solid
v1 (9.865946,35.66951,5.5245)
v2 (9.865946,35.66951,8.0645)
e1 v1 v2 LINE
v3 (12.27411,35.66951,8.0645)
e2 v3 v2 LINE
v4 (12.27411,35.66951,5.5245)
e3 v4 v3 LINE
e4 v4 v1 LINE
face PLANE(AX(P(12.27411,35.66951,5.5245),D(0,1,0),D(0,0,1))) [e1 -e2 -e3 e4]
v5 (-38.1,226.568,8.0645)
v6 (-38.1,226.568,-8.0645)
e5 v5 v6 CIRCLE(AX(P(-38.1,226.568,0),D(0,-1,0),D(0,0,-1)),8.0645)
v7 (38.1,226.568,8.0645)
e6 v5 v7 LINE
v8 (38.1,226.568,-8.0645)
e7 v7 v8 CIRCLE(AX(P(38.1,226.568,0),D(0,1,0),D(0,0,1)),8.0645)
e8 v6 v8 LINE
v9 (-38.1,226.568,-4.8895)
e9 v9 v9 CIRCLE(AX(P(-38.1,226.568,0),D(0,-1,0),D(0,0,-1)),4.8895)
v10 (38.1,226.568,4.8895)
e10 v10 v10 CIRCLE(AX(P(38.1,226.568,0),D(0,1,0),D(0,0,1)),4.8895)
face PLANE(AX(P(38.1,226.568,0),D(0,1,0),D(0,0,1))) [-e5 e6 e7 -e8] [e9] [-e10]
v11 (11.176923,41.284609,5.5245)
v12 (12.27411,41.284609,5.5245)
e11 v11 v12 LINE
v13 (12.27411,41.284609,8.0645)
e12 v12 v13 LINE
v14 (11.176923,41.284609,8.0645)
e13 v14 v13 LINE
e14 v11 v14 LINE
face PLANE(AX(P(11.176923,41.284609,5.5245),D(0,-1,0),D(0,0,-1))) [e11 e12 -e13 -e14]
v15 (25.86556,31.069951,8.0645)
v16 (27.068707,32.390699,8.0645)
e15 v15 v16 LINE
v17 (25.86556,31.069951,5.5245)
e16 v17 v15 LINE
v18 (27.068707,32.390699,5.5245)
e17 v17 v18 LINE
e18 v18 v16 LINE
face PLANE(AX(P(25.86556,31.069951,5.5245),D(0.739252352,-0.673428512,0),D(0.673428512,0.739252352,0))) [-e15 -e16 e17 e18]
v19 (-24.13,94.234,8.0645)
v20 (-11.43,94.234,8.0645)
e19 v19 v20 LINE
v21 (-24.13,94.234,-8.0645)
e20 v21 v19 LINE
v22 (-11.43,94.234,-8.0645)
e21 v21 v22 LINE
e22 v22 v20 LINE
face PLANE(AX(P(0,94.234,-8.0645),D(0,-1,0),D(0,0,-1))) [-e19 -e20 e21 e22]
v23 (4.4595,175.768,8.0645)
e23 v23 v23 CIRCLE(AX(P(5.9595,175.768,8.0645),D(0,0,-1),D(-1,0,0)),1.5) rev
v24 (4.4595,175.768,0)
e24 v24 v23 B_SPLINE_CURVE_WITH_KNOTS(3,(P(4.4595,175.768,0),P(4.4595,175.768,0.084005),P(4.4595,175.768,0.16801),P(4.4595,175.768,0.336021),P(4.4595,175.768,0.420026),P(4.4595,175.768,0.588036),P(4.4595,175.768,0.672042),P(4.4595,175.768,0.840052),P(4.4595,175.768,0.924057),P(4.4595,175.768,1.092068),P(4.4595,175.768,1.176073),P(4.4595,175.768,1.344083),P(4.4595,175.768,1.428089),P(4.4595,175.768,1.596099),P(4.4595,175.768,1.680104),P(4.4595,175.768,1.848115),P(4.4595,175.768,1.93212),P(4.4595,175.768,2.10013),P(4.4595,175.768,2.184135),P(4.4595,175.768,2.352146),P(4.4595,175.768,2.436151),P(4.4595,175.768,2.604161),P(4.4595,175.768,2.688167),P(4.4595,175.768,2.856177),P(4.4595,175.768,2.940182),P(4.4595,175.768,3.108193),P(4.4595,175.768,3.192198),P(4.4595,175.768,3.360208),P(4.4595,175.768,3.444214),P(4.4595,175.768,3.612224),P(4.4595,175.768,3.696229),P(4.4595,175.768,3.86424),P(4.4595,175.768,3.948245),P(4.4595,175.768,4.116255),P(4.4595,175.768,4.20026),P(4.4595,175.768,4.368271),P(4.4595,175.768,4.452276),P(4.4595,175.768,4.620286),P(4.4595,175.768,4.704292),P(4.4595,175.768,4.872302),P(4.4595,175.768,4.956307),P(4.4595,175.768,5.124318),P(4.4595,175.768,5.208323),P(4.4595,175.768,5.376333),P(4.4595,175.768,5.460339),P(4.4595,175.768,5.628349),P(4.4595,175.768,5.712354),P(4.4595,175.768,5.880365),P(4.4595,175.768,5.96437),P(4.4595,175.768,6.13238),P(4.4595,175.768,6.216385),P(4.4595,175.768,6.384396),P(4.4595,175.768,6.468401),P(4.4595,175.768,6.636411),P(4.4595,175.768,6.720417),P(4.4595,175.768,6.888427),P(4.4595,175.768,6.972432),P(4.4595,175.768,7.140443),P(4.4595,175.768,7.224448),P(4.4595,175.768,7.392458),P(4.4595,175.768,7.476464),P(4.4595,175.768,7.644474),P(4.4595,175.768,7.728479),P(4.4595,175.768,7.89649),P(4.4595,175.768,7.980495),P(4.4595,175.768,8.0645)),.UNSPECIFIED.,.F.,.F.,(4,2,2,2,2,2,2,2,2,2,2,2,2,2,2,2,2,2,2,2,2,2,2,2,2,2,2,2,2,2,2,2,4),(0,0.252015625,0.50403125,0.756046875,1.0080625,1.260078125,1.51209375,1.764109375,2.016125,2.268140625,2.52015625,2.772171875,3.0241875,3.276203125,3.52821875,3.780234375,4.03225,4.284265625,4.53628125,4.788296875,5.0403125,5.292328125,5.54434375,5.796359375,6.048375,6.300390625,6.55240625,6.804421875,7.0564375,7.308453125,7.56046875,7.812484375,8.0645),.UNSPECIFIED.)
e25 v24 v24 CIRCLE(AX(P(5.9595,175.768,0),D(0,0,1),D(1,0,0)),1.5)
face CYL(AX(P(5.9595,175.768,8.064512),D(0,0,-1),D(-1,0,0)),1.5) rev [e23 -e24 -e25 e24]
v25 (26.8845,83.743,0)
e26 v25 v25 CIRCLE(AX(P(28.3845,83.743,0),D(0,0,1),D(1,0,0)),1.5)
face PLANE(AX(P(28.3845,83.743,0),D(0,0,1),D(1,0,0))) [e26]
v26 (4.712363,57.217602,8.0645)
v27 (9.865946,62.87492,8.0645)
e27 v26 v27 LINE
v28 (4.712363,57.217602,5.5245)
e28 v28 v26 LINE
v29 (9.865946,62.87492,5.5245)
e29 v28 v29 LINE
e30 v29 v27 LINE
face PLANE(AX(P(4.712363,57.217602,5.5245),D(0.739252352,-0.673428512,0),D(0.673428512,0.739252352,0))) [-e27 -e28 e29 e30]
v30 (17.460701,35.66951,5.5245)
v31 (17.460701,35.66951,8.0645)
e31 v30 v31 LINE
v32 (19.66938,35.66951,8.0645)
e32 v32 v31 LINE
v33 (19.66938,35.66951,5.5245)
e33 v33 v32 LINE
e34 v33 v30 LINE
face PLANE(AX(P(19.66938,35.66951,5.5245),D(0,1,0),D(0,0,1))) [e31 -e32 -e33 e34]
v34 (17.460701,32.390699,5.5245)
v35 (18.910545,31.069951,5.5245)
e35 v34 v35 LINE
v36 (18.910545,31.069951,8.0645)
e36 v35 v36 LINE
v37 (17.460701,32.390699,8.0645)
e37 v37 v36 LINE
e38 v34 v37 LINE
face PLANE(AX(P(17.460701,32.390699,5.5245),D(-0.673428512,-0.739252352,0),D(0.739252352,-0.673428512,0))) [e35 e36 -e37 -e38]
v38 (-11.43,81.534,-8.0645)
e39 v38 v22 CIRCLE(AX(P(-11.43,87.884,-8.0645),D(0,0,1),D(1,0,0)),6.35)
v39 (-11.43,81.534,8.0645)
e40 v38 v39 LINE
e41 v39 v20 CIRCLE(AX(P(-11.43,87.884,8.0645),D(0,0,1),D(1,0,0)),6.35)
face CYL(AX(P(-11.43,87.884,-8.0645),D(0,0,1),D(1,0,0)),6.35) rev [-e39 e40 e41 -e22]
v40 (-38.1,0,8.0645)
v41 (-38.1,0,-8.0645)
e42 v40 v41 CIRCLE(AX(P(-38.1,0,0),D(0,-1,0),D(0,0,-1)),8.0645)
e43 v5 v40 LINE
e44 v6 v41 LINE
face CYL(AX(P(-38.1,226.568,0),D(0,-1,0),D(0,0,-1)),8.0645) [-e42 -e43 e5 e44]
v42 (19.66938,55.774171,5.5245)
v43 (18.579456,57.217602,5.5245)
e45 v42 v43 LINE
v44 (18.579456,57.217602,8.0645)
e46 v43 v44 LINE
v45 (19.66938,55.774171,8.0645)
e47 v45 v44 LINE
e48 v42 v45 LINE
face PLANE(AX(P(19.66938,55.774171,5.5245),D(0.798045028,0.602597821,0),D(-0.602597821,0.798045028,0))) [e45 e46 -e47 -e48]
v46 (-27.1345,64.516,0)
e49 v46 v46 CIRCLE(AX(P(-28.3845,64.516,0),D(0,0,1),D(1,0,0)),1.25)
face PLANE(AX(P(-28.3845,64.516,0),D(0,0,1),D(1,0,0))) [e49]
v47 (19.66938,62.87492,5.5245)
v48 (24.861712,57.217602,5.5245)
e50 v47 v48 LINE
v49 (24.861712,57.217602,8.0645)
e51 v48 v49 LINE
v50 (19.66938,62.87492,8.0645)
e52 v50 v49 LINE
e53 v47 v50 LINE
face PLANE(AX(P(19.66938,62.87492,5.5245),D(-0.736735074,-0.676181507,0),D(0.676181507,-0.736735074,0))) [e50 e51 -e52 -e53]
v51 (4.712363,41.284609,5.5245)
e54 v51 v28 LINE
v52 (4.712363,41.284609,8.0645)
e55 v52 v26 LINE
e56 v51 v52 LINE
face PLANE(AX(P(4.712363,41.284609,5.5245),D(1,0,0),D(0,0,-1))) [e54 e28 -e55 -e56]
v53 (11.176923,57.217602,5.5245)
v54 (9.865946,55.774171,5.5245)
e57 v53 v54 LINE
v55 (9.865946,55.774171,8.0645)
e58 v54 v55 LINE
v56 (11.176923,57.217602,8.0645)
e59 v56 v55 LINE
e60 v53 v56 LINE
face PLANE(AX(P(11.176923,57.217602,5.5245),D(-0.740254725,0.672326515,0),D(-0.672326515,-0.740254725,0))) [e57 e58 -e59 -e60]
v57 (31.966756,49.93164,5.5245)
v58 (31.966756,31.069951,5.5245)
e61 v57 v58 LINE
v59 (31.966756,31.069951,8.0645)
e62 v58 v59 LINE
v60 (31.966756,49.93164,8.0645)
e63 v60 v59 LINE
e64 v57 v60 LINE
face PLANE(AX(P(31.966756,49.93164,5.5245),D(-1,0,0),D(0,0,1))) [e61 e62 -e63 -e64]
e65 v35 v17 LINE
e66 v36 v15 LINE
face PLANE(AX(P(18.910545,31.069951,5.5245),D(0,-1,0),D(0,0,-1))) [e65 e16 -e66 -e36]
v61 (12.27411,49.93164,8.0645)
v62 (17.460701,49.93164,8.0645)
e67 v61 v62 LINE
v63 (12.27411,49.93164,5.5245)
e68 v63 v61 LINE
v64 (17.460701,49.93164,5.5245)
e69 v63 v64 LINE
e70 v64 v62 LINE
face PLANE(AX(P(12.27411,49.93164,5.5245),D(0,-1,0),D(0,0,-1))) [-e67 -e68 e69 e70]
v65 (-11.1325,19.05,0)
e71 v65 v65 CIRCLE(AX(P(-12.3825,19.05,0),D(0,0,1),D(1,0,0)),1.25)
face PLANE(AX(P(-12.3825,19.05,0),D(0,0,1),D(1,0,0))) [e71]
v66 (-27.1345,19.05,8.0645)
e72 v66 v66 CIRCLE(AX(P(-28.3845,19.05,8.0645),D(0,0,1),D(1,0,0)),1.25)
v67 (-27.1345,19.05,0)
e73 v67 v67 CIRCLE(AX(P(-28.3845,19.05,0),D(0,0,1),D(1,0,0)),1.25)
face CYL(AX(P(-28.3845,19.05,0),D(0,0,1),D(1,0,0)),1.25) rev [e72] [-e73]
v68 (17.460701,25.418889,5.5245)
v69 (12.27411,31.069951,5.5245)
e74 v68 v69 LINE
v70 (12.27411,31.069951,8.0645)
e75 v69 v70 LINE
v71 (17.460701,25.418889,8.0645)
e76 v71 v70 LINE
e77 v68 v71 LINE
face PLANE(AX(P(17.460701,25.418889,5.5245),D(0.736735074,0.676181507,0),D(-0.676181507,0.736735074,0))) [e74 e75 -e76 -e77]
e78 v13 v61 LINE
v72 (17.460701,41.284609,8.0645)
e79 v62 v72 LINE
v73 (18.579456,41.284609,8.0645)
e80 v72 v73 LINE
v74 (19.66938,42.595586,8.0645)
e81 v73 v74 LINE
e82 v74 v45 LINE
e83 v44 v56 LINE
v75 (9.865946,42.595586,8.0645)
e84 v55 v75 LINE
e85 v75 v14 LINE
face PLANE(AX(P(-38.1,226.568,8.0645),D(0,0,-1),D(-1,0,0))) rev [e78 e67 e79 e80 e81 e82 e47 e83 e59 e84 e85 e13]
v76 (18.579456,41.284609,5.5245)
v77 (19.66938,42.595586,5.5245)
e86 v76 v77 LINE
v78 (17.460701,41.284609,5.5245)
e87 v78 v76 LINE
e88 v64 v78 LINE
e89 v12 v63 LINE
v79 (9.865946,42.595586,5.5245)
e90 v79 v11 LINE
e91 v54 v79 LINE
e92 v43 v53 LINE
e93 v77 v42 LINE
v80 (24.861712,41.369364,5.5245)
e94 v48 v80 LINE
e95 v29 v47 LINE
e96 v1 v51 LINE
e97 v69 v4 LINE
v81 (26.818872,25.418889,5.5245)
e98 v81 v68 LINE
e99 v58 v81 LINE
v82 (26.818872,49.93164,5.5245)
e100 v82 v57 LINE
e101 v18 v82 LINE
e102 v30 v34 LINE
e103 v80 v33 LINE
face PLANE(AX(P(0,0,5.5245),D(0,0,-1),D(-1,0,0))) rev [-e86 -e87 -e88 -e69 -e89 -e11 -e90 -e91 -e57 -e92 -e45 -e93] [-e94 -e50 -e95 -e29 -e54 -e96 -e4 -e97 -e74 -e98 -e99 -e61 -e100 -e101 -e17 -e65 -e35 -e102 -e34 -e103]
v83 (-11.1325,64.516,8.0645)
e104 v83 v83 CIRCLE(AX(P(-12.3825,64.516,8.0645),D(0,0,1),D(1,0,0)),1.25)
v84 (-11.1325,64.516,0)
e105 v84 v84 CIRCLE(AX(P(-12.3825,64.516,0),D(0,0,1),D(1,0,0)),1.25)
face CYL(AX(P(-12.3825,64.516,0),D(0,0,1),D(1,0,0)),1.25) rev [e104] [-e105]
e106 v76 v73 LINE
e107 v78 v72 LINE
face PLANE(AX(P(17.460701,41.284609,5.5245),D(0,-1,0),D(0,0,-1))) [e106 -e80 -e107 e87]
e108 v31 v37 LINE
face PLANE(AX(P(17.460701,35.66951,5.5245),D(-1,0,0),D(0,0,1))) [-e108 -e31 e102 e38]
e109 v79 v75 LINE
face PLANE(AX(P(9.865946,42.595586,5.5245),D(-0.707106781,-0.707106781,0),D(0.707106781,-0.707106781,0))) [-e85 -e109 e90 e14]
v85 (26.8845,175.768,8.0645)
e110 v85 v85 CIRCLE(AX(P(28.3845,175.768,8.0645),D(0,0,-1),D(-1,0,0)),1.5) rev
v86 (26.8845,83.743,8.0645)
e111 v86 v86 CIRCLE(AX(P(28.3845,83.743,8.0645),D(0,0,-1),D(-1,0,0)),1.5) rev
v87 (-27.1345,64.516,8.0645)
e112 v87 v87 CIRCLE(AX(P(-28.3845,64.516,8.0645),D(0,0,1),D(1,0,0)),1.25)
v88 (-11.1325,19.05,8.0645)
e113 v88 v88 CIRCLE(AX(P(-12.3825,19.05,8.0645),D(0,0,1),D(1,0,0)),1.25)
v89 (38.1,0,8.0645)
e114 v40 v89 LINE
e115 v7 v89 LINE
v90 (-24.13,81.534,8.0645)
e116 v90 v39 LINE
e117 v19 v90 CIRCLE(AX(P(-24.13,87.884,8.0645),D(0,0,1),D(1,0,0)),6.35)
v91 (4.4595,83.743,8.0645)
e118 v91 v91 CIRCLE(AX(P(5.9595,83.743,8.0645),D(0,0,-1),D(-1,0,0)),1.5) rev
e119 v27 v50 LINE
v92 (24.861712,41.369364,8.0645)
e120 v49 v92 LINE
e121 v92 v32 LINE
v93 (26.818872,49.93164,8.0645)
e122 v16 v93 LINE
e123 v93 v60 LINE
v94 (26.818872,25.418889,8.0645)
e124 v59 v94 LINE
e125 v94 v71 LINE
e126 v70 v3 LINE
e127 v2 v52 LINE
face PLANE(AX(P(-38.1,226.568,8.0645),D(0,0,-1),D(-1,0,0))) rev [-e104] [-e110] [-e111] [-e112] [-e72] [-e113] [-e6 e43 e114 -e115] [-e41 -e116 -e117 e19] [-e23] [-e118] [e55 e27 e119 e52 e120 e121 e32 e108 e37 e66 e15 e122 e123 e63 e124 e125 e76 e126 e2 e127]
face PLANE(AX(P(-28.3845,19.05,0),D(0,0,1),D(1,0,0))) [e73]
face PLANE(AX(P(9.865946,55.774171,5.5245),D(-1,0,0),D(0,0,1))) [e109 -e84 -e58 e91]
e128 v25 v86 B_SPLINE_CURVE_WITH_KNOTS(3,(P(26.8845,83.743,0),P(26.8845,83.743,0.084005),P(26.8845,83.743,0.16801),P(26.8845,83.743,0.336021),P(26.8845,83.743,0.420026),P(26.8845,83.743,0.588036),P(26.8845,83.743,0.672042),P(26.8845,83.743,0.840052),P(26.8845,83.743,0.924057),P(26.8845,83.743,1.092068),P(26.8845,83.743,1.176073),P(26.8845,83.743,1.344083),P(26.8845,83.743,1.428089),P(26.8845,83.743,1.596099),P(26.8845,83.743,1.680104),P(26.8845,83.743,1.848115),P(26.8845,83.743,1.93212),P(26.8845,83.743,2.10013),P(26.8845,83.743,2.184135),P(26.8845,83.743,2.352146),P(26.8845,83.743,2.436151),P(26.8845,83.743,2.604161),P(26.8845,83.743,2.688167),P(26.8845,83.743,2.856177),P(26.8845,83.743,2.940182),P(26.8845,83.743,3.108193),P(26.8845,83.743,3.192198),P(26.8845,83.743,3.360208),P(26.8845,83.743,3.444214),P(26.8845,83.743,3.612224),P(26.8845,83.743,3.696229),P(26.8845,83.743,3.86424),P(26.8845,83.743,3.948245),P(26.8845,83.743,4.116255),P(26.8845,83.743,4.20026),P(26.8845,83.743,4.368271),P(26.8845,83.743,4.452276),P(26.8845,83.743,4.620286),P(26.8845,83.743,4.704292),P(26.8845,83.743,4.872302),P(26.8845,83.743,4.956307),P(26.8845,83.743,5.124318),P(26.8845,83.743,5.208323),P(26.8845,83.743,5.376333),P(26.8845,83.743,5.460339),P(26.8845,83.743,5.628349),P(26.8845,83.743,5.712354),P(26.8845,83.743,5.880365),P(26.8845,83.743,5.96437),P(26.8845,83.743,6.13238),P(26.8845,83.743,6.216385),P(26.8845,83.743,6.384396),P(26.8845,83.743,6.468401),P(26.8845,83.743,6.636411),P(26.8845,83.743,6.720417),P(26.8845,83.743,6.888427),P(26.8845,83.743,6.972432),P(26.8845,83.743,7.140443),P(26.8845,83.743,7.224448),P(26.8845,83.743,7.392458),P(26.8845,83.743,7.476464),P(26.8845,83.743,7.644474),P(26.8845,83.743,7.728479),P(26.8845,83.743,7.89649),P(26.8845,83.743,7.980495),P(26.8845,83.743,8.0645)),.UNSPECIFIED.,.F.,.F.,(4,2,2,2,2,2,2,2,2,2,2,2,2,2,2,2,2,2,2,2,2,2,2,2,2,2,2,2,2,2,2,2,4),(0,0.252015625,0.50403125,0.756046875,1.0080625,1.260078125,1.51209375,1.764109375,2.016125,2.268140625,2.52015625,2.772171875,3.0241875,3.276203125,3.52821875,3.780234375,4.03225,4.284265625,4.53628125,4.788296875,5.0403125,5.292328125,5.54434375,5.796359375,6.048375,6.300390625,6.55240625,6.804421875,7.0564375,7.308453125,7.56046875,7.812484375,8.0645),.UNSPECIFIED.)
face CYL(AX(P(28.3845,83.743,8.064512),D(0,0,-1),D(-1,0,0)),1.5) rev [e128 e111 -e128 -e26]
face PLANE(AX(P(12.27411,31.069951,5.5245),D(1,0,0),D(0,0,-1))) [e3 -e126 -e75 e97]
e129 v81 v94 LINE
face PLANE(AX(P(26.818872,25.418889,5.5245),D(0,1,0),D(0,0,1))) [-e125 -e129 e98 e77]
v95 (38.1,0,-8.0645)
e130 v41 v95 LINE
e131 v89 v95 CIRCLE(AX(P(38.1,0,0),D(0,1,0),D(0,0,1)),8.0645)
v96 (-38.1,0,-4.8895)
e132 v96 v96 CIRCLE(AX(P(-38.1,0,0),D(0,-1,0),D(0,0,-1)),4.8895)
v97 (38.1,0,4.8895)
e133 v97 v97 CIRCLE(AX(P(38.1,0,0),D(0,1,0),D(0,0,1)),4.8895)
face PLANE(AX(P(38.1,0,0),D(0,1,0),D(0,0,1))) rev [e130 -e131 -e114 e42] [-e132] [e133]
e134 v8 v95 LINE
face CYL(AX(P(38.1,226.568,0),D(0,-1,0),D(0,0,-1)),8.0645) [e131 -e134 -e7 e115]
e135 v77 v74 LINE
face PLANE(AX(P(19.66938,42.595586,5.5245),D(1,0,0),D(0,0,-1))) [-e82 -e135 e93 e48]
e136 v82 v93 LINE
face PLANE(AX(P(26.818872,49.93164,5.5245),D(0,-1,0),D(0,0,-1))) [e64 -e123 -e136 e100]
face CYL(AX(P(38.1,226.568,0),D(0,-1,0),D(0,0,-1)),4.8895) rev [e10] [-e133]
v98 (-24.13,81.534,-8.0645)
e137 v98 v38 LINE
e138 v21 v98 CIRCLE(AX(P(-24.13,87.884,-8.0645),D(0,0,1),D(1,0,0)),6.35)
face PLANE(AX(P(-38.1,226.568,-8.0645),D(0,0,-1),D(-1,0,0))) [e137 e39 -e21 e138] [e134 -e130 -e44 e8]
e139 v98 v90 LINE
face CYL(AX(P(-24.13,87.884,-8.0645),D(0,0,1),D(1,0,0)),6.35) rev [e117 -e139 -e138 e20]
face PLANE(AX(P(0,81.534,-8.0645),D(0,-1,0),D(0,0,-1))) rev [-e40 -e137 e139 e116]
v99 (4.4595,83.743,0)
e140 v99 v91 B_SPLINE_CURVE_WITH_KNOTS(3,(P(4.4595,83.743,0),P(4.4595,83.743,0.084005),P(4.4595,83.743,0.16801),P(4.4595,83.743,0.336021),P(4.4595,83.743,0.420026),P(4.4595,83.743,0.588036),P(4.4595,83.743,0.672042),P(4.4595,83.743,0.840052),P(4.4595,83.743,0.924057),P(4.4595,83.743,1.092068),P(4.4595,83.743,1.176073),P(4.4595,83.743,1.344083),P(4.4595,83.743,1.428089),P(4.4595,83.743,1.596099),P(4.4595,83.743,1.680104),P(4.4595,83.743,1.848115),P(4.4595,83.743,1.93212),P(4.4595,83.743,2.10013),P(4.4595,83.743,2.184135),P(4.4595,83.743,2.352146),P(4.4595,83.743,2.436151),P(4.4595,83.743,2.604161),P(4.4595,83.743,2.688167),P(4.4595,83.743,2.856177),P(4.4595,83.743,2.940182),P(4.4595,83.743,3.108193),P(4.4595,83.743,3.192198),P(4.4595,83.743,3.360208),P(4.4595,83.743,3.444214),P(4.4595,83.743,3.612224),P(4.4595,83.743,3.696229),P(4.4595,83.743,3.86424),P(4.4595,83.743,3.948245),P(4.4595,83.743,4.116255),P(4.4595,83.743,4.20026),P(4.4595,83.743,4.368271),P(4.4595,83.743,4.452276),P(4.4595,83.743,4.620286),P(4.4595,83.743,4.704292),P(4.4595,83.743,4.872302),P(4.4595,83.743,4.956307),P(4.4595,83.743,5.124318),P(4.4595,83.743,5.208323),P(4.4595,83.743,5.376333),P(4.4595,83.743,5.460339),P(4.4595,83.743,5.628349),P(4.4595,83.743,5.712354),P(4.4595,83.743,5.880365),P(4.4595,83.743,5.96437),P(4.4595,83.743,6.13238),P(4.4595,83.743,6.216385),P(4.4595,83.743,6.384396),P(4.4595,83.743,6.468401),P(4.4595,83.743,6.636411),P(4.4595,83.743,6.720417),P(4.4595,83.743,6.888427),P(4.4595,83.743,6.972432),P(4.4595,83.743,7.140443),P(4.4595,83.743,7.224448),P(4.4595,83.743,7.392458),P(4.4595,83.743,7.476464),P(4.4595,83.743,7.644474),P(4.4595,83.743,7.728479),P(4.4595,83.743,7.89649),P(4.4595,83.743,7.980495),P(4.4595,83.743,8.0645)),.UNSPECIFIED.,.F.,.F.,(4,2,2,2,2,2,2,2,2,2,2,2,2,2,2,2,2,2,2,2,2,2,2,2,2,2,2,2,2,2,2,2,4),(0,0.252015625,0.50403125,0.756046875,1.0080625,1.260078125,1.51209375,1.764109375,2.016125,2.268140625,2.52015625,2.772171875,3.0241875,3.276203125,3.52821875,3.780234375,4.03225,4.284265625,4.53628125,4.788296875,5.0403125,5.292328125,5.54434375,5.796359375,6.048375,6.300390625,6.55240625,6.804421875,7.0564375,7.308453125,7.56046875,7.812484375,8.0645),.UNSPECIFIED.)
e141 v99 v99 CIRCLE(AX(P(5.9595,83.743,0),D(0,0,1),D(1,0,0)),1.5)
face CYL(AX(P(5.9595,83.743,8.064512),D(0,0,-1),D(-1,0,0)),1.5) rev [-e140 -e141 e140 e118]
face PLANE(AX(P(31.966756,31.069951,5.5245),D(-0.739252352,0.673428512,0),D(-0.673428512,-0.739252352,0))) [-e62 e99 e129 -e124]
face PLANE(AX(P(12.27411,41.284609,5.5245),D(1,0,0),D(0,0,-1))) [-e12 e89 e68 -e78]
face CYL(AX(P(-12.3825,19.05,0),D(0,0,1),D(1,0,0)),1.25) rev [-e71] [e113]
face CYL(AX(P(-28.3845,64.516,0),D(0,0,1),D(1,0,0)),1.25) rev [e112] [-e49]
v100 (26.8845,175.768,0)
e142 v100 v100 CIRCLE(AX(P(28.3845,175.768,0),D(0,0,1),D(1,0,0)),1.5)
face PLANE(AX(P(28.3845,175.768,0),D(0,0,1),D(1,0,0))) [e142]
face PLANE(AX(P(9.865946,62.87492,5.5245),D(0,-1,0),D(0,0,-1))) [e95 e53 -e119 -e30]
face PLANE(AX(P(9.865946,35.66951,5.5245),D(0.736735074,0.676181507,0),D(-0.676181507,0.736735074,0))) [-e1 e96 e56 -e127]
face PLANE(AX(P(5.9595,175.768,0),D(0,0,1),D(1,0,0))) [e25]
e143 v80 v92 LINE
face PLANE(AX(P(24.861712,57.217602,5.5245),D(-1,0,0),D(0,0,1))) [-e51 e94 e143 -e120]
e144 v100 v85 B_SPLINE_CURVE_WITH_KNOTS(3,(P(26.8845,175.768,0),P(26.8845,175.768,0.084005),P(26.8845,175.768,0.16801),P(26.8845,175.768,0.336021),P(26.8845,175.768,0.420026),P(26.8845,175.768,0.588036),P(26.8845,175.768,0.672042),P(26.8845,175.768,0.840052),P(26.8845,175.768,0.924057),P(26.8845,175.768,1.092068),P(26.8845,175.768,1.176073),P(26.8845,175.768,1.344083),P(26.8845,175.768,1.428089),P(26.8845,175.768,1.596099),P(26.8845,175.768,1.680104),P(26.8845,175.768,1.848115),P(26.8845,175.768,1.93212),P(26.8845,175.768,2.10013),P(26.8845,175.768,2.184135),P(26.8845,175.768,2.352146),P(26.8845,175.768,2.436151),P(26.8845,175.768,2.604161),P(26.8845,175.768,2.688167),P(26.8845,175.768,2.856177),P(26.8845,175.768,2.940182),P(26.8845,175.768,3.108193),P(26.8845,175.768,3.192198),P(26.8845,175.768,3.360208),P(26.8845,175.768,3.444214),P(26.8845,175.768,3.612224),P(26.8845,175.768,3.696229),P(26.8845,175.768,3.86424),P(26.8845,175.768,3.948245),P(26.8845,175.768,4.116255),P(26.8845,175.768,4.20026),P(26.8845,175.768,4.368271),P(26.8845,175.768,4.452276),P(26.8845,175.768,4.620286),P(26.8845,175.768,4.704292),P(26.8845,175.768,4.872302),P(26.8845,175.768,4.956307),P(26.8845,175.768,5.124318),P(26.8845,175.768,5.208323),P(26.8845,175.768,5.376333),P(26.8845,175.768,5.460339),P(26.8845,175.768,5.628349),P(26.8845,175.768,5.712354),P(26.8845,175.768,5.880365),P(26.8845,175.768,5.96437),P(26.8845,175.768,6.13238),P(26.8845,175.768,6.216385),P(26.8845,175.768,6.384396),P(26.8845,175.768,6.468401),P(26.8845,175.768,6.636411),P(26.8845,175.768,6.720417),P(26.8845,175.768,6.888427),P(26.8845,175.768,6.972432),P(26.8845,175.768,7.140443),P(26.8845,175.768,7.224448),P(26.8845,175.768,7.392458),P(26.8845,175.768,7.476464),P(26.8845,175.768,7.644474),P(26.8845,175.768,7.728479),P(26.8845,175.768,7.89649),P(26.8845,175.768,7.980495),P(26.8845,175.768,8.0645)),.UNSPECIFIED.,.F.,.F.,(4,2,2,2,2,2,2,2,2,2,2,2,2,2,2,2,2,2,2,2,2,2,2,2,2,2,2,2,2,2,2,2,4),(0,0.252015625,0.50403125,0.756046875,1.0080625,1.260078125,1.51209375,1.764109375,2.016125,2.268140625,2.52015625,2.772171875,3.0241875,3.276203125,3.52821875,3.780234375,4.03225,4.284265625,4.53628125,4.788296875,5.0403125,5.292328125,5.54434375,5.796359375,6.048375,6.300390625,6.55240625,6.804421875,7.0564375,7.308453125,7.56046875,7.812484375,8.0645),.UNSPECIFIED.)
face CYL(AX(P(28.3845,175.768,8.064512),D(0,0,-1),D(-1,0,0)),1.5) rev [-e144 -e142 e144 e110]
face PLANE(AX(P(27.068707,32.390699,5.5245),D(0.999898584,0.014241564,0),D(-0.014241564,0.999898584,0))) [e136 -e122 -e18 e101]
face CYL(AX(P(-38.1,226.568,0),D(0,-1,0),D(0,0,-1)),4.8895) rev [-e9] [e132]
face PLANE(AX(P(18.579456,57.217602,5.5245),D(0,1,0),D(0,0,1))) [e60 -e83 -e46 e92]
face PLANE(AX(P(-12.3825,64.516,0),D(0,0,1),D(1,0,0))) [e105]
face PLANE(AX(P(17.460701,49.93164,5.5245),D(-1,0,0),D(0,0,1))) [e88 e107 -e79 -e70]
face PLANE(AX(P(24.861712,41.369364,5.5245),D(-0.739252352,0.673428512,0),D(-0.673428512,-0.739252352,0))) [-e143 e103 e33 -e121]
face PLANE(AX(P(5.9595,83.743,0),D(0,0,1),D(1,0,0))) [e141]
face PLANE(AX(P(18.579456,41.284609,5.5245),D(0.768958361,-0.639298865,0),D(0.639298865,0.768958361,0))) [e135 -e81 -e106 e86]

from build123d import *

# Parameters (mm, degrees)
SKETCH1_R               = 4.8895
BOSS_EXTRUDE1_DEPTH     = 226.568
CUT_EXTRUDE2_DEPTH      = 232.785168476
CUT_EXTRUDE2_DEPTH_BACK = 232.785168476
CUT_EXTRUDE3_START      = 5.5245
CUT_EXTRUDE3_DEPTH      = 2.54
CUT_EXTRUDE4_DEPTH      = 232.785168476
CUT_EXTRUDE4_DEPTH_BACK = 8.0645
SKETCH6_R               = 1.5
SKETCH7_R               = 1.25
CUT_EXTRUDE5_DEPTH      = 8.0645


# Read off the part's stored shape, not the designer's step: Cut-Extrude3
with BuildPart() as part:
    # Sketch1 → Boss-Extrude1 (new body)
    with BuildSketch(Plane(origin=(0, 0, 0), x_dir=(1, 0, 0), z_dir=(0, 1, 0))):
        with BuildLine():
            Line((-38.1, 8.0645), (38.1, 8.0645))
            ThreePointArc((38.1, 8.0645), (46.1645, 0), (38.1, -8.0645))
            Line((38.1, -8.0645), (-38.1, -8.0645))
            ThreePointArc((-38.1, -8.0645), (-46.1645, 0), (-38.1, 8.0645))
        make_face()
        with Locations(Location((38.1, 0, 0), (0, 0, 270))):
            Circle(SKETCH1_R, mode=Mode.SUBTRACT)
        with Locations(Location((-38.1, 0, 0), (0, 0, 90))):
            Circle(SKETCH1_R, mode=Mode.SUBTRACT)
    extrude(amount=BOSS_EXTRUDE1_DEPTH)

    # Sketch2 → Cut-Extrude2 (cut, two sides: drawn at the far end of the back side and taken through both)
    with BuildSketch(Plane.XY.offset(8.0645).offset(-CUT_EXTRUDE2_DEPTH_BACK)):
        with BuildLine():
            Line((-24.13, 81.534), (-11.43, 81.534))
            ThreePointArc((-11.43, 81.534), (-5.08, 87.884), (-11.43, 94.234))
            Line((-11.43, 94.234), (-24.13, 94.234))
            ThreePointArc((-24.13, 94.234), (-30.48, 87.884), (-24.13, 81.534))
        make_face()
    extrude(amount=CUT_EXTRUDE2_DEPTH + CUT_EXTRUDE2_DEPTH_BACK, mode=Mode.SUBTRACT)

    # Cut-Extrude3 outline → Cut-Extrude3 (cut)
    with BuildSketch(Plane.XY.offset(CUT_EXTRUDE3_START)):
        Polygon((4.712362594, 41.284608988), (9.865946199, 35.669510433), (12.274110435, 35.669510433), (12.274110435, 31.069950753), (17.460700987, 25.418889406), (26.818871611, 25.418889406), (31.966756262, 31.069950753), (31.966756262, 49.931639685), (26.818871611, 49.931639685), (27.068707369, 32.39069939), (25.865559638, 31.069950753), (18.910545355, 31.069950753), (17.460700987, 32.39069939), (17.460700987, 35.669510433), (19.669379675, 35.669510433), (24.861712029, 41.369363995), (24.861712029, 57.217602301), (19.669379675, 62.874919643), (9.865946199, 62.874919643), (4.712362594, 57.217602301), align=None)
        Polygon((17.460700987, 41.284608988), (17.460700987, 49.931639685), (12.274110435, 49.931639685), (12.274110435, 41.284608988), (11.176923497, 41.284608988), (9.865946199, 42.595586286), (9.865946199, 55.774170995), (11.176923497, 57.217602301), (18.57945551, 57.217602301), (19.669379675, 55.774170995), (19.669379675, 42.595586286), (18.57945551, 41.284608988), align=None, mode=Mode.SUBTRACT)
    extrude(amount=CUT_EXTRUDE3_DEPTH, mode=Mode.SUBTRACT)

    # Sketch6 → Cut-Extrude4 (cut, two sides: drawn at the far end of the back side and taken through both)
    with BuildSketch(Plane.XY.offset(8.0645).offset(-CUT_EXTRUDE4_DEPTH_BACK)):
        with Locations(Location((28.3845, 175.768, 0), (0, 0, 180))):
            Circle(SKETCH6_R)
        with Locations(Location((5.9595, 175.768, 0), (0, 0, 180))):
            Circle(SKETCH6_R)
        with Locations(Location((5.9595, 83.743, 0), (0, 0, 180))):
            Circle(SKETCH6_R)
        with Locations(Location((28.3845, 83.743, 0), (0, 0, 180))):
            Circle(SKETCH6_R)
    extrude(amount=CUT_EXTRUDE4_DEPTH + CUT_EXTRUDE4_DEPTH_BACK, mode=Mode.SUBTRACT)

    # Sketch7 → Cut-Extrude5 (cut)
    with BuildSketch(Plane.XY.offset(8.0645)):
        with Locations((-12.3825, 64.516)):
            Circle(SKETCH7_R)
        with Locations((-28.3845, 64.516)):
            Circle(SKETCH7_R)
        with Locations((-12.3825, 19.05)):
            Circle(SKETCH7_R)
        with Locations((-28.3845, 19.05)):
            Circle(SKETCH7_R)
    extrude(amount=-CUT_EXTRUDE5_DEPTH, mode=Mode.SUBTRACT)


solid = part.part
